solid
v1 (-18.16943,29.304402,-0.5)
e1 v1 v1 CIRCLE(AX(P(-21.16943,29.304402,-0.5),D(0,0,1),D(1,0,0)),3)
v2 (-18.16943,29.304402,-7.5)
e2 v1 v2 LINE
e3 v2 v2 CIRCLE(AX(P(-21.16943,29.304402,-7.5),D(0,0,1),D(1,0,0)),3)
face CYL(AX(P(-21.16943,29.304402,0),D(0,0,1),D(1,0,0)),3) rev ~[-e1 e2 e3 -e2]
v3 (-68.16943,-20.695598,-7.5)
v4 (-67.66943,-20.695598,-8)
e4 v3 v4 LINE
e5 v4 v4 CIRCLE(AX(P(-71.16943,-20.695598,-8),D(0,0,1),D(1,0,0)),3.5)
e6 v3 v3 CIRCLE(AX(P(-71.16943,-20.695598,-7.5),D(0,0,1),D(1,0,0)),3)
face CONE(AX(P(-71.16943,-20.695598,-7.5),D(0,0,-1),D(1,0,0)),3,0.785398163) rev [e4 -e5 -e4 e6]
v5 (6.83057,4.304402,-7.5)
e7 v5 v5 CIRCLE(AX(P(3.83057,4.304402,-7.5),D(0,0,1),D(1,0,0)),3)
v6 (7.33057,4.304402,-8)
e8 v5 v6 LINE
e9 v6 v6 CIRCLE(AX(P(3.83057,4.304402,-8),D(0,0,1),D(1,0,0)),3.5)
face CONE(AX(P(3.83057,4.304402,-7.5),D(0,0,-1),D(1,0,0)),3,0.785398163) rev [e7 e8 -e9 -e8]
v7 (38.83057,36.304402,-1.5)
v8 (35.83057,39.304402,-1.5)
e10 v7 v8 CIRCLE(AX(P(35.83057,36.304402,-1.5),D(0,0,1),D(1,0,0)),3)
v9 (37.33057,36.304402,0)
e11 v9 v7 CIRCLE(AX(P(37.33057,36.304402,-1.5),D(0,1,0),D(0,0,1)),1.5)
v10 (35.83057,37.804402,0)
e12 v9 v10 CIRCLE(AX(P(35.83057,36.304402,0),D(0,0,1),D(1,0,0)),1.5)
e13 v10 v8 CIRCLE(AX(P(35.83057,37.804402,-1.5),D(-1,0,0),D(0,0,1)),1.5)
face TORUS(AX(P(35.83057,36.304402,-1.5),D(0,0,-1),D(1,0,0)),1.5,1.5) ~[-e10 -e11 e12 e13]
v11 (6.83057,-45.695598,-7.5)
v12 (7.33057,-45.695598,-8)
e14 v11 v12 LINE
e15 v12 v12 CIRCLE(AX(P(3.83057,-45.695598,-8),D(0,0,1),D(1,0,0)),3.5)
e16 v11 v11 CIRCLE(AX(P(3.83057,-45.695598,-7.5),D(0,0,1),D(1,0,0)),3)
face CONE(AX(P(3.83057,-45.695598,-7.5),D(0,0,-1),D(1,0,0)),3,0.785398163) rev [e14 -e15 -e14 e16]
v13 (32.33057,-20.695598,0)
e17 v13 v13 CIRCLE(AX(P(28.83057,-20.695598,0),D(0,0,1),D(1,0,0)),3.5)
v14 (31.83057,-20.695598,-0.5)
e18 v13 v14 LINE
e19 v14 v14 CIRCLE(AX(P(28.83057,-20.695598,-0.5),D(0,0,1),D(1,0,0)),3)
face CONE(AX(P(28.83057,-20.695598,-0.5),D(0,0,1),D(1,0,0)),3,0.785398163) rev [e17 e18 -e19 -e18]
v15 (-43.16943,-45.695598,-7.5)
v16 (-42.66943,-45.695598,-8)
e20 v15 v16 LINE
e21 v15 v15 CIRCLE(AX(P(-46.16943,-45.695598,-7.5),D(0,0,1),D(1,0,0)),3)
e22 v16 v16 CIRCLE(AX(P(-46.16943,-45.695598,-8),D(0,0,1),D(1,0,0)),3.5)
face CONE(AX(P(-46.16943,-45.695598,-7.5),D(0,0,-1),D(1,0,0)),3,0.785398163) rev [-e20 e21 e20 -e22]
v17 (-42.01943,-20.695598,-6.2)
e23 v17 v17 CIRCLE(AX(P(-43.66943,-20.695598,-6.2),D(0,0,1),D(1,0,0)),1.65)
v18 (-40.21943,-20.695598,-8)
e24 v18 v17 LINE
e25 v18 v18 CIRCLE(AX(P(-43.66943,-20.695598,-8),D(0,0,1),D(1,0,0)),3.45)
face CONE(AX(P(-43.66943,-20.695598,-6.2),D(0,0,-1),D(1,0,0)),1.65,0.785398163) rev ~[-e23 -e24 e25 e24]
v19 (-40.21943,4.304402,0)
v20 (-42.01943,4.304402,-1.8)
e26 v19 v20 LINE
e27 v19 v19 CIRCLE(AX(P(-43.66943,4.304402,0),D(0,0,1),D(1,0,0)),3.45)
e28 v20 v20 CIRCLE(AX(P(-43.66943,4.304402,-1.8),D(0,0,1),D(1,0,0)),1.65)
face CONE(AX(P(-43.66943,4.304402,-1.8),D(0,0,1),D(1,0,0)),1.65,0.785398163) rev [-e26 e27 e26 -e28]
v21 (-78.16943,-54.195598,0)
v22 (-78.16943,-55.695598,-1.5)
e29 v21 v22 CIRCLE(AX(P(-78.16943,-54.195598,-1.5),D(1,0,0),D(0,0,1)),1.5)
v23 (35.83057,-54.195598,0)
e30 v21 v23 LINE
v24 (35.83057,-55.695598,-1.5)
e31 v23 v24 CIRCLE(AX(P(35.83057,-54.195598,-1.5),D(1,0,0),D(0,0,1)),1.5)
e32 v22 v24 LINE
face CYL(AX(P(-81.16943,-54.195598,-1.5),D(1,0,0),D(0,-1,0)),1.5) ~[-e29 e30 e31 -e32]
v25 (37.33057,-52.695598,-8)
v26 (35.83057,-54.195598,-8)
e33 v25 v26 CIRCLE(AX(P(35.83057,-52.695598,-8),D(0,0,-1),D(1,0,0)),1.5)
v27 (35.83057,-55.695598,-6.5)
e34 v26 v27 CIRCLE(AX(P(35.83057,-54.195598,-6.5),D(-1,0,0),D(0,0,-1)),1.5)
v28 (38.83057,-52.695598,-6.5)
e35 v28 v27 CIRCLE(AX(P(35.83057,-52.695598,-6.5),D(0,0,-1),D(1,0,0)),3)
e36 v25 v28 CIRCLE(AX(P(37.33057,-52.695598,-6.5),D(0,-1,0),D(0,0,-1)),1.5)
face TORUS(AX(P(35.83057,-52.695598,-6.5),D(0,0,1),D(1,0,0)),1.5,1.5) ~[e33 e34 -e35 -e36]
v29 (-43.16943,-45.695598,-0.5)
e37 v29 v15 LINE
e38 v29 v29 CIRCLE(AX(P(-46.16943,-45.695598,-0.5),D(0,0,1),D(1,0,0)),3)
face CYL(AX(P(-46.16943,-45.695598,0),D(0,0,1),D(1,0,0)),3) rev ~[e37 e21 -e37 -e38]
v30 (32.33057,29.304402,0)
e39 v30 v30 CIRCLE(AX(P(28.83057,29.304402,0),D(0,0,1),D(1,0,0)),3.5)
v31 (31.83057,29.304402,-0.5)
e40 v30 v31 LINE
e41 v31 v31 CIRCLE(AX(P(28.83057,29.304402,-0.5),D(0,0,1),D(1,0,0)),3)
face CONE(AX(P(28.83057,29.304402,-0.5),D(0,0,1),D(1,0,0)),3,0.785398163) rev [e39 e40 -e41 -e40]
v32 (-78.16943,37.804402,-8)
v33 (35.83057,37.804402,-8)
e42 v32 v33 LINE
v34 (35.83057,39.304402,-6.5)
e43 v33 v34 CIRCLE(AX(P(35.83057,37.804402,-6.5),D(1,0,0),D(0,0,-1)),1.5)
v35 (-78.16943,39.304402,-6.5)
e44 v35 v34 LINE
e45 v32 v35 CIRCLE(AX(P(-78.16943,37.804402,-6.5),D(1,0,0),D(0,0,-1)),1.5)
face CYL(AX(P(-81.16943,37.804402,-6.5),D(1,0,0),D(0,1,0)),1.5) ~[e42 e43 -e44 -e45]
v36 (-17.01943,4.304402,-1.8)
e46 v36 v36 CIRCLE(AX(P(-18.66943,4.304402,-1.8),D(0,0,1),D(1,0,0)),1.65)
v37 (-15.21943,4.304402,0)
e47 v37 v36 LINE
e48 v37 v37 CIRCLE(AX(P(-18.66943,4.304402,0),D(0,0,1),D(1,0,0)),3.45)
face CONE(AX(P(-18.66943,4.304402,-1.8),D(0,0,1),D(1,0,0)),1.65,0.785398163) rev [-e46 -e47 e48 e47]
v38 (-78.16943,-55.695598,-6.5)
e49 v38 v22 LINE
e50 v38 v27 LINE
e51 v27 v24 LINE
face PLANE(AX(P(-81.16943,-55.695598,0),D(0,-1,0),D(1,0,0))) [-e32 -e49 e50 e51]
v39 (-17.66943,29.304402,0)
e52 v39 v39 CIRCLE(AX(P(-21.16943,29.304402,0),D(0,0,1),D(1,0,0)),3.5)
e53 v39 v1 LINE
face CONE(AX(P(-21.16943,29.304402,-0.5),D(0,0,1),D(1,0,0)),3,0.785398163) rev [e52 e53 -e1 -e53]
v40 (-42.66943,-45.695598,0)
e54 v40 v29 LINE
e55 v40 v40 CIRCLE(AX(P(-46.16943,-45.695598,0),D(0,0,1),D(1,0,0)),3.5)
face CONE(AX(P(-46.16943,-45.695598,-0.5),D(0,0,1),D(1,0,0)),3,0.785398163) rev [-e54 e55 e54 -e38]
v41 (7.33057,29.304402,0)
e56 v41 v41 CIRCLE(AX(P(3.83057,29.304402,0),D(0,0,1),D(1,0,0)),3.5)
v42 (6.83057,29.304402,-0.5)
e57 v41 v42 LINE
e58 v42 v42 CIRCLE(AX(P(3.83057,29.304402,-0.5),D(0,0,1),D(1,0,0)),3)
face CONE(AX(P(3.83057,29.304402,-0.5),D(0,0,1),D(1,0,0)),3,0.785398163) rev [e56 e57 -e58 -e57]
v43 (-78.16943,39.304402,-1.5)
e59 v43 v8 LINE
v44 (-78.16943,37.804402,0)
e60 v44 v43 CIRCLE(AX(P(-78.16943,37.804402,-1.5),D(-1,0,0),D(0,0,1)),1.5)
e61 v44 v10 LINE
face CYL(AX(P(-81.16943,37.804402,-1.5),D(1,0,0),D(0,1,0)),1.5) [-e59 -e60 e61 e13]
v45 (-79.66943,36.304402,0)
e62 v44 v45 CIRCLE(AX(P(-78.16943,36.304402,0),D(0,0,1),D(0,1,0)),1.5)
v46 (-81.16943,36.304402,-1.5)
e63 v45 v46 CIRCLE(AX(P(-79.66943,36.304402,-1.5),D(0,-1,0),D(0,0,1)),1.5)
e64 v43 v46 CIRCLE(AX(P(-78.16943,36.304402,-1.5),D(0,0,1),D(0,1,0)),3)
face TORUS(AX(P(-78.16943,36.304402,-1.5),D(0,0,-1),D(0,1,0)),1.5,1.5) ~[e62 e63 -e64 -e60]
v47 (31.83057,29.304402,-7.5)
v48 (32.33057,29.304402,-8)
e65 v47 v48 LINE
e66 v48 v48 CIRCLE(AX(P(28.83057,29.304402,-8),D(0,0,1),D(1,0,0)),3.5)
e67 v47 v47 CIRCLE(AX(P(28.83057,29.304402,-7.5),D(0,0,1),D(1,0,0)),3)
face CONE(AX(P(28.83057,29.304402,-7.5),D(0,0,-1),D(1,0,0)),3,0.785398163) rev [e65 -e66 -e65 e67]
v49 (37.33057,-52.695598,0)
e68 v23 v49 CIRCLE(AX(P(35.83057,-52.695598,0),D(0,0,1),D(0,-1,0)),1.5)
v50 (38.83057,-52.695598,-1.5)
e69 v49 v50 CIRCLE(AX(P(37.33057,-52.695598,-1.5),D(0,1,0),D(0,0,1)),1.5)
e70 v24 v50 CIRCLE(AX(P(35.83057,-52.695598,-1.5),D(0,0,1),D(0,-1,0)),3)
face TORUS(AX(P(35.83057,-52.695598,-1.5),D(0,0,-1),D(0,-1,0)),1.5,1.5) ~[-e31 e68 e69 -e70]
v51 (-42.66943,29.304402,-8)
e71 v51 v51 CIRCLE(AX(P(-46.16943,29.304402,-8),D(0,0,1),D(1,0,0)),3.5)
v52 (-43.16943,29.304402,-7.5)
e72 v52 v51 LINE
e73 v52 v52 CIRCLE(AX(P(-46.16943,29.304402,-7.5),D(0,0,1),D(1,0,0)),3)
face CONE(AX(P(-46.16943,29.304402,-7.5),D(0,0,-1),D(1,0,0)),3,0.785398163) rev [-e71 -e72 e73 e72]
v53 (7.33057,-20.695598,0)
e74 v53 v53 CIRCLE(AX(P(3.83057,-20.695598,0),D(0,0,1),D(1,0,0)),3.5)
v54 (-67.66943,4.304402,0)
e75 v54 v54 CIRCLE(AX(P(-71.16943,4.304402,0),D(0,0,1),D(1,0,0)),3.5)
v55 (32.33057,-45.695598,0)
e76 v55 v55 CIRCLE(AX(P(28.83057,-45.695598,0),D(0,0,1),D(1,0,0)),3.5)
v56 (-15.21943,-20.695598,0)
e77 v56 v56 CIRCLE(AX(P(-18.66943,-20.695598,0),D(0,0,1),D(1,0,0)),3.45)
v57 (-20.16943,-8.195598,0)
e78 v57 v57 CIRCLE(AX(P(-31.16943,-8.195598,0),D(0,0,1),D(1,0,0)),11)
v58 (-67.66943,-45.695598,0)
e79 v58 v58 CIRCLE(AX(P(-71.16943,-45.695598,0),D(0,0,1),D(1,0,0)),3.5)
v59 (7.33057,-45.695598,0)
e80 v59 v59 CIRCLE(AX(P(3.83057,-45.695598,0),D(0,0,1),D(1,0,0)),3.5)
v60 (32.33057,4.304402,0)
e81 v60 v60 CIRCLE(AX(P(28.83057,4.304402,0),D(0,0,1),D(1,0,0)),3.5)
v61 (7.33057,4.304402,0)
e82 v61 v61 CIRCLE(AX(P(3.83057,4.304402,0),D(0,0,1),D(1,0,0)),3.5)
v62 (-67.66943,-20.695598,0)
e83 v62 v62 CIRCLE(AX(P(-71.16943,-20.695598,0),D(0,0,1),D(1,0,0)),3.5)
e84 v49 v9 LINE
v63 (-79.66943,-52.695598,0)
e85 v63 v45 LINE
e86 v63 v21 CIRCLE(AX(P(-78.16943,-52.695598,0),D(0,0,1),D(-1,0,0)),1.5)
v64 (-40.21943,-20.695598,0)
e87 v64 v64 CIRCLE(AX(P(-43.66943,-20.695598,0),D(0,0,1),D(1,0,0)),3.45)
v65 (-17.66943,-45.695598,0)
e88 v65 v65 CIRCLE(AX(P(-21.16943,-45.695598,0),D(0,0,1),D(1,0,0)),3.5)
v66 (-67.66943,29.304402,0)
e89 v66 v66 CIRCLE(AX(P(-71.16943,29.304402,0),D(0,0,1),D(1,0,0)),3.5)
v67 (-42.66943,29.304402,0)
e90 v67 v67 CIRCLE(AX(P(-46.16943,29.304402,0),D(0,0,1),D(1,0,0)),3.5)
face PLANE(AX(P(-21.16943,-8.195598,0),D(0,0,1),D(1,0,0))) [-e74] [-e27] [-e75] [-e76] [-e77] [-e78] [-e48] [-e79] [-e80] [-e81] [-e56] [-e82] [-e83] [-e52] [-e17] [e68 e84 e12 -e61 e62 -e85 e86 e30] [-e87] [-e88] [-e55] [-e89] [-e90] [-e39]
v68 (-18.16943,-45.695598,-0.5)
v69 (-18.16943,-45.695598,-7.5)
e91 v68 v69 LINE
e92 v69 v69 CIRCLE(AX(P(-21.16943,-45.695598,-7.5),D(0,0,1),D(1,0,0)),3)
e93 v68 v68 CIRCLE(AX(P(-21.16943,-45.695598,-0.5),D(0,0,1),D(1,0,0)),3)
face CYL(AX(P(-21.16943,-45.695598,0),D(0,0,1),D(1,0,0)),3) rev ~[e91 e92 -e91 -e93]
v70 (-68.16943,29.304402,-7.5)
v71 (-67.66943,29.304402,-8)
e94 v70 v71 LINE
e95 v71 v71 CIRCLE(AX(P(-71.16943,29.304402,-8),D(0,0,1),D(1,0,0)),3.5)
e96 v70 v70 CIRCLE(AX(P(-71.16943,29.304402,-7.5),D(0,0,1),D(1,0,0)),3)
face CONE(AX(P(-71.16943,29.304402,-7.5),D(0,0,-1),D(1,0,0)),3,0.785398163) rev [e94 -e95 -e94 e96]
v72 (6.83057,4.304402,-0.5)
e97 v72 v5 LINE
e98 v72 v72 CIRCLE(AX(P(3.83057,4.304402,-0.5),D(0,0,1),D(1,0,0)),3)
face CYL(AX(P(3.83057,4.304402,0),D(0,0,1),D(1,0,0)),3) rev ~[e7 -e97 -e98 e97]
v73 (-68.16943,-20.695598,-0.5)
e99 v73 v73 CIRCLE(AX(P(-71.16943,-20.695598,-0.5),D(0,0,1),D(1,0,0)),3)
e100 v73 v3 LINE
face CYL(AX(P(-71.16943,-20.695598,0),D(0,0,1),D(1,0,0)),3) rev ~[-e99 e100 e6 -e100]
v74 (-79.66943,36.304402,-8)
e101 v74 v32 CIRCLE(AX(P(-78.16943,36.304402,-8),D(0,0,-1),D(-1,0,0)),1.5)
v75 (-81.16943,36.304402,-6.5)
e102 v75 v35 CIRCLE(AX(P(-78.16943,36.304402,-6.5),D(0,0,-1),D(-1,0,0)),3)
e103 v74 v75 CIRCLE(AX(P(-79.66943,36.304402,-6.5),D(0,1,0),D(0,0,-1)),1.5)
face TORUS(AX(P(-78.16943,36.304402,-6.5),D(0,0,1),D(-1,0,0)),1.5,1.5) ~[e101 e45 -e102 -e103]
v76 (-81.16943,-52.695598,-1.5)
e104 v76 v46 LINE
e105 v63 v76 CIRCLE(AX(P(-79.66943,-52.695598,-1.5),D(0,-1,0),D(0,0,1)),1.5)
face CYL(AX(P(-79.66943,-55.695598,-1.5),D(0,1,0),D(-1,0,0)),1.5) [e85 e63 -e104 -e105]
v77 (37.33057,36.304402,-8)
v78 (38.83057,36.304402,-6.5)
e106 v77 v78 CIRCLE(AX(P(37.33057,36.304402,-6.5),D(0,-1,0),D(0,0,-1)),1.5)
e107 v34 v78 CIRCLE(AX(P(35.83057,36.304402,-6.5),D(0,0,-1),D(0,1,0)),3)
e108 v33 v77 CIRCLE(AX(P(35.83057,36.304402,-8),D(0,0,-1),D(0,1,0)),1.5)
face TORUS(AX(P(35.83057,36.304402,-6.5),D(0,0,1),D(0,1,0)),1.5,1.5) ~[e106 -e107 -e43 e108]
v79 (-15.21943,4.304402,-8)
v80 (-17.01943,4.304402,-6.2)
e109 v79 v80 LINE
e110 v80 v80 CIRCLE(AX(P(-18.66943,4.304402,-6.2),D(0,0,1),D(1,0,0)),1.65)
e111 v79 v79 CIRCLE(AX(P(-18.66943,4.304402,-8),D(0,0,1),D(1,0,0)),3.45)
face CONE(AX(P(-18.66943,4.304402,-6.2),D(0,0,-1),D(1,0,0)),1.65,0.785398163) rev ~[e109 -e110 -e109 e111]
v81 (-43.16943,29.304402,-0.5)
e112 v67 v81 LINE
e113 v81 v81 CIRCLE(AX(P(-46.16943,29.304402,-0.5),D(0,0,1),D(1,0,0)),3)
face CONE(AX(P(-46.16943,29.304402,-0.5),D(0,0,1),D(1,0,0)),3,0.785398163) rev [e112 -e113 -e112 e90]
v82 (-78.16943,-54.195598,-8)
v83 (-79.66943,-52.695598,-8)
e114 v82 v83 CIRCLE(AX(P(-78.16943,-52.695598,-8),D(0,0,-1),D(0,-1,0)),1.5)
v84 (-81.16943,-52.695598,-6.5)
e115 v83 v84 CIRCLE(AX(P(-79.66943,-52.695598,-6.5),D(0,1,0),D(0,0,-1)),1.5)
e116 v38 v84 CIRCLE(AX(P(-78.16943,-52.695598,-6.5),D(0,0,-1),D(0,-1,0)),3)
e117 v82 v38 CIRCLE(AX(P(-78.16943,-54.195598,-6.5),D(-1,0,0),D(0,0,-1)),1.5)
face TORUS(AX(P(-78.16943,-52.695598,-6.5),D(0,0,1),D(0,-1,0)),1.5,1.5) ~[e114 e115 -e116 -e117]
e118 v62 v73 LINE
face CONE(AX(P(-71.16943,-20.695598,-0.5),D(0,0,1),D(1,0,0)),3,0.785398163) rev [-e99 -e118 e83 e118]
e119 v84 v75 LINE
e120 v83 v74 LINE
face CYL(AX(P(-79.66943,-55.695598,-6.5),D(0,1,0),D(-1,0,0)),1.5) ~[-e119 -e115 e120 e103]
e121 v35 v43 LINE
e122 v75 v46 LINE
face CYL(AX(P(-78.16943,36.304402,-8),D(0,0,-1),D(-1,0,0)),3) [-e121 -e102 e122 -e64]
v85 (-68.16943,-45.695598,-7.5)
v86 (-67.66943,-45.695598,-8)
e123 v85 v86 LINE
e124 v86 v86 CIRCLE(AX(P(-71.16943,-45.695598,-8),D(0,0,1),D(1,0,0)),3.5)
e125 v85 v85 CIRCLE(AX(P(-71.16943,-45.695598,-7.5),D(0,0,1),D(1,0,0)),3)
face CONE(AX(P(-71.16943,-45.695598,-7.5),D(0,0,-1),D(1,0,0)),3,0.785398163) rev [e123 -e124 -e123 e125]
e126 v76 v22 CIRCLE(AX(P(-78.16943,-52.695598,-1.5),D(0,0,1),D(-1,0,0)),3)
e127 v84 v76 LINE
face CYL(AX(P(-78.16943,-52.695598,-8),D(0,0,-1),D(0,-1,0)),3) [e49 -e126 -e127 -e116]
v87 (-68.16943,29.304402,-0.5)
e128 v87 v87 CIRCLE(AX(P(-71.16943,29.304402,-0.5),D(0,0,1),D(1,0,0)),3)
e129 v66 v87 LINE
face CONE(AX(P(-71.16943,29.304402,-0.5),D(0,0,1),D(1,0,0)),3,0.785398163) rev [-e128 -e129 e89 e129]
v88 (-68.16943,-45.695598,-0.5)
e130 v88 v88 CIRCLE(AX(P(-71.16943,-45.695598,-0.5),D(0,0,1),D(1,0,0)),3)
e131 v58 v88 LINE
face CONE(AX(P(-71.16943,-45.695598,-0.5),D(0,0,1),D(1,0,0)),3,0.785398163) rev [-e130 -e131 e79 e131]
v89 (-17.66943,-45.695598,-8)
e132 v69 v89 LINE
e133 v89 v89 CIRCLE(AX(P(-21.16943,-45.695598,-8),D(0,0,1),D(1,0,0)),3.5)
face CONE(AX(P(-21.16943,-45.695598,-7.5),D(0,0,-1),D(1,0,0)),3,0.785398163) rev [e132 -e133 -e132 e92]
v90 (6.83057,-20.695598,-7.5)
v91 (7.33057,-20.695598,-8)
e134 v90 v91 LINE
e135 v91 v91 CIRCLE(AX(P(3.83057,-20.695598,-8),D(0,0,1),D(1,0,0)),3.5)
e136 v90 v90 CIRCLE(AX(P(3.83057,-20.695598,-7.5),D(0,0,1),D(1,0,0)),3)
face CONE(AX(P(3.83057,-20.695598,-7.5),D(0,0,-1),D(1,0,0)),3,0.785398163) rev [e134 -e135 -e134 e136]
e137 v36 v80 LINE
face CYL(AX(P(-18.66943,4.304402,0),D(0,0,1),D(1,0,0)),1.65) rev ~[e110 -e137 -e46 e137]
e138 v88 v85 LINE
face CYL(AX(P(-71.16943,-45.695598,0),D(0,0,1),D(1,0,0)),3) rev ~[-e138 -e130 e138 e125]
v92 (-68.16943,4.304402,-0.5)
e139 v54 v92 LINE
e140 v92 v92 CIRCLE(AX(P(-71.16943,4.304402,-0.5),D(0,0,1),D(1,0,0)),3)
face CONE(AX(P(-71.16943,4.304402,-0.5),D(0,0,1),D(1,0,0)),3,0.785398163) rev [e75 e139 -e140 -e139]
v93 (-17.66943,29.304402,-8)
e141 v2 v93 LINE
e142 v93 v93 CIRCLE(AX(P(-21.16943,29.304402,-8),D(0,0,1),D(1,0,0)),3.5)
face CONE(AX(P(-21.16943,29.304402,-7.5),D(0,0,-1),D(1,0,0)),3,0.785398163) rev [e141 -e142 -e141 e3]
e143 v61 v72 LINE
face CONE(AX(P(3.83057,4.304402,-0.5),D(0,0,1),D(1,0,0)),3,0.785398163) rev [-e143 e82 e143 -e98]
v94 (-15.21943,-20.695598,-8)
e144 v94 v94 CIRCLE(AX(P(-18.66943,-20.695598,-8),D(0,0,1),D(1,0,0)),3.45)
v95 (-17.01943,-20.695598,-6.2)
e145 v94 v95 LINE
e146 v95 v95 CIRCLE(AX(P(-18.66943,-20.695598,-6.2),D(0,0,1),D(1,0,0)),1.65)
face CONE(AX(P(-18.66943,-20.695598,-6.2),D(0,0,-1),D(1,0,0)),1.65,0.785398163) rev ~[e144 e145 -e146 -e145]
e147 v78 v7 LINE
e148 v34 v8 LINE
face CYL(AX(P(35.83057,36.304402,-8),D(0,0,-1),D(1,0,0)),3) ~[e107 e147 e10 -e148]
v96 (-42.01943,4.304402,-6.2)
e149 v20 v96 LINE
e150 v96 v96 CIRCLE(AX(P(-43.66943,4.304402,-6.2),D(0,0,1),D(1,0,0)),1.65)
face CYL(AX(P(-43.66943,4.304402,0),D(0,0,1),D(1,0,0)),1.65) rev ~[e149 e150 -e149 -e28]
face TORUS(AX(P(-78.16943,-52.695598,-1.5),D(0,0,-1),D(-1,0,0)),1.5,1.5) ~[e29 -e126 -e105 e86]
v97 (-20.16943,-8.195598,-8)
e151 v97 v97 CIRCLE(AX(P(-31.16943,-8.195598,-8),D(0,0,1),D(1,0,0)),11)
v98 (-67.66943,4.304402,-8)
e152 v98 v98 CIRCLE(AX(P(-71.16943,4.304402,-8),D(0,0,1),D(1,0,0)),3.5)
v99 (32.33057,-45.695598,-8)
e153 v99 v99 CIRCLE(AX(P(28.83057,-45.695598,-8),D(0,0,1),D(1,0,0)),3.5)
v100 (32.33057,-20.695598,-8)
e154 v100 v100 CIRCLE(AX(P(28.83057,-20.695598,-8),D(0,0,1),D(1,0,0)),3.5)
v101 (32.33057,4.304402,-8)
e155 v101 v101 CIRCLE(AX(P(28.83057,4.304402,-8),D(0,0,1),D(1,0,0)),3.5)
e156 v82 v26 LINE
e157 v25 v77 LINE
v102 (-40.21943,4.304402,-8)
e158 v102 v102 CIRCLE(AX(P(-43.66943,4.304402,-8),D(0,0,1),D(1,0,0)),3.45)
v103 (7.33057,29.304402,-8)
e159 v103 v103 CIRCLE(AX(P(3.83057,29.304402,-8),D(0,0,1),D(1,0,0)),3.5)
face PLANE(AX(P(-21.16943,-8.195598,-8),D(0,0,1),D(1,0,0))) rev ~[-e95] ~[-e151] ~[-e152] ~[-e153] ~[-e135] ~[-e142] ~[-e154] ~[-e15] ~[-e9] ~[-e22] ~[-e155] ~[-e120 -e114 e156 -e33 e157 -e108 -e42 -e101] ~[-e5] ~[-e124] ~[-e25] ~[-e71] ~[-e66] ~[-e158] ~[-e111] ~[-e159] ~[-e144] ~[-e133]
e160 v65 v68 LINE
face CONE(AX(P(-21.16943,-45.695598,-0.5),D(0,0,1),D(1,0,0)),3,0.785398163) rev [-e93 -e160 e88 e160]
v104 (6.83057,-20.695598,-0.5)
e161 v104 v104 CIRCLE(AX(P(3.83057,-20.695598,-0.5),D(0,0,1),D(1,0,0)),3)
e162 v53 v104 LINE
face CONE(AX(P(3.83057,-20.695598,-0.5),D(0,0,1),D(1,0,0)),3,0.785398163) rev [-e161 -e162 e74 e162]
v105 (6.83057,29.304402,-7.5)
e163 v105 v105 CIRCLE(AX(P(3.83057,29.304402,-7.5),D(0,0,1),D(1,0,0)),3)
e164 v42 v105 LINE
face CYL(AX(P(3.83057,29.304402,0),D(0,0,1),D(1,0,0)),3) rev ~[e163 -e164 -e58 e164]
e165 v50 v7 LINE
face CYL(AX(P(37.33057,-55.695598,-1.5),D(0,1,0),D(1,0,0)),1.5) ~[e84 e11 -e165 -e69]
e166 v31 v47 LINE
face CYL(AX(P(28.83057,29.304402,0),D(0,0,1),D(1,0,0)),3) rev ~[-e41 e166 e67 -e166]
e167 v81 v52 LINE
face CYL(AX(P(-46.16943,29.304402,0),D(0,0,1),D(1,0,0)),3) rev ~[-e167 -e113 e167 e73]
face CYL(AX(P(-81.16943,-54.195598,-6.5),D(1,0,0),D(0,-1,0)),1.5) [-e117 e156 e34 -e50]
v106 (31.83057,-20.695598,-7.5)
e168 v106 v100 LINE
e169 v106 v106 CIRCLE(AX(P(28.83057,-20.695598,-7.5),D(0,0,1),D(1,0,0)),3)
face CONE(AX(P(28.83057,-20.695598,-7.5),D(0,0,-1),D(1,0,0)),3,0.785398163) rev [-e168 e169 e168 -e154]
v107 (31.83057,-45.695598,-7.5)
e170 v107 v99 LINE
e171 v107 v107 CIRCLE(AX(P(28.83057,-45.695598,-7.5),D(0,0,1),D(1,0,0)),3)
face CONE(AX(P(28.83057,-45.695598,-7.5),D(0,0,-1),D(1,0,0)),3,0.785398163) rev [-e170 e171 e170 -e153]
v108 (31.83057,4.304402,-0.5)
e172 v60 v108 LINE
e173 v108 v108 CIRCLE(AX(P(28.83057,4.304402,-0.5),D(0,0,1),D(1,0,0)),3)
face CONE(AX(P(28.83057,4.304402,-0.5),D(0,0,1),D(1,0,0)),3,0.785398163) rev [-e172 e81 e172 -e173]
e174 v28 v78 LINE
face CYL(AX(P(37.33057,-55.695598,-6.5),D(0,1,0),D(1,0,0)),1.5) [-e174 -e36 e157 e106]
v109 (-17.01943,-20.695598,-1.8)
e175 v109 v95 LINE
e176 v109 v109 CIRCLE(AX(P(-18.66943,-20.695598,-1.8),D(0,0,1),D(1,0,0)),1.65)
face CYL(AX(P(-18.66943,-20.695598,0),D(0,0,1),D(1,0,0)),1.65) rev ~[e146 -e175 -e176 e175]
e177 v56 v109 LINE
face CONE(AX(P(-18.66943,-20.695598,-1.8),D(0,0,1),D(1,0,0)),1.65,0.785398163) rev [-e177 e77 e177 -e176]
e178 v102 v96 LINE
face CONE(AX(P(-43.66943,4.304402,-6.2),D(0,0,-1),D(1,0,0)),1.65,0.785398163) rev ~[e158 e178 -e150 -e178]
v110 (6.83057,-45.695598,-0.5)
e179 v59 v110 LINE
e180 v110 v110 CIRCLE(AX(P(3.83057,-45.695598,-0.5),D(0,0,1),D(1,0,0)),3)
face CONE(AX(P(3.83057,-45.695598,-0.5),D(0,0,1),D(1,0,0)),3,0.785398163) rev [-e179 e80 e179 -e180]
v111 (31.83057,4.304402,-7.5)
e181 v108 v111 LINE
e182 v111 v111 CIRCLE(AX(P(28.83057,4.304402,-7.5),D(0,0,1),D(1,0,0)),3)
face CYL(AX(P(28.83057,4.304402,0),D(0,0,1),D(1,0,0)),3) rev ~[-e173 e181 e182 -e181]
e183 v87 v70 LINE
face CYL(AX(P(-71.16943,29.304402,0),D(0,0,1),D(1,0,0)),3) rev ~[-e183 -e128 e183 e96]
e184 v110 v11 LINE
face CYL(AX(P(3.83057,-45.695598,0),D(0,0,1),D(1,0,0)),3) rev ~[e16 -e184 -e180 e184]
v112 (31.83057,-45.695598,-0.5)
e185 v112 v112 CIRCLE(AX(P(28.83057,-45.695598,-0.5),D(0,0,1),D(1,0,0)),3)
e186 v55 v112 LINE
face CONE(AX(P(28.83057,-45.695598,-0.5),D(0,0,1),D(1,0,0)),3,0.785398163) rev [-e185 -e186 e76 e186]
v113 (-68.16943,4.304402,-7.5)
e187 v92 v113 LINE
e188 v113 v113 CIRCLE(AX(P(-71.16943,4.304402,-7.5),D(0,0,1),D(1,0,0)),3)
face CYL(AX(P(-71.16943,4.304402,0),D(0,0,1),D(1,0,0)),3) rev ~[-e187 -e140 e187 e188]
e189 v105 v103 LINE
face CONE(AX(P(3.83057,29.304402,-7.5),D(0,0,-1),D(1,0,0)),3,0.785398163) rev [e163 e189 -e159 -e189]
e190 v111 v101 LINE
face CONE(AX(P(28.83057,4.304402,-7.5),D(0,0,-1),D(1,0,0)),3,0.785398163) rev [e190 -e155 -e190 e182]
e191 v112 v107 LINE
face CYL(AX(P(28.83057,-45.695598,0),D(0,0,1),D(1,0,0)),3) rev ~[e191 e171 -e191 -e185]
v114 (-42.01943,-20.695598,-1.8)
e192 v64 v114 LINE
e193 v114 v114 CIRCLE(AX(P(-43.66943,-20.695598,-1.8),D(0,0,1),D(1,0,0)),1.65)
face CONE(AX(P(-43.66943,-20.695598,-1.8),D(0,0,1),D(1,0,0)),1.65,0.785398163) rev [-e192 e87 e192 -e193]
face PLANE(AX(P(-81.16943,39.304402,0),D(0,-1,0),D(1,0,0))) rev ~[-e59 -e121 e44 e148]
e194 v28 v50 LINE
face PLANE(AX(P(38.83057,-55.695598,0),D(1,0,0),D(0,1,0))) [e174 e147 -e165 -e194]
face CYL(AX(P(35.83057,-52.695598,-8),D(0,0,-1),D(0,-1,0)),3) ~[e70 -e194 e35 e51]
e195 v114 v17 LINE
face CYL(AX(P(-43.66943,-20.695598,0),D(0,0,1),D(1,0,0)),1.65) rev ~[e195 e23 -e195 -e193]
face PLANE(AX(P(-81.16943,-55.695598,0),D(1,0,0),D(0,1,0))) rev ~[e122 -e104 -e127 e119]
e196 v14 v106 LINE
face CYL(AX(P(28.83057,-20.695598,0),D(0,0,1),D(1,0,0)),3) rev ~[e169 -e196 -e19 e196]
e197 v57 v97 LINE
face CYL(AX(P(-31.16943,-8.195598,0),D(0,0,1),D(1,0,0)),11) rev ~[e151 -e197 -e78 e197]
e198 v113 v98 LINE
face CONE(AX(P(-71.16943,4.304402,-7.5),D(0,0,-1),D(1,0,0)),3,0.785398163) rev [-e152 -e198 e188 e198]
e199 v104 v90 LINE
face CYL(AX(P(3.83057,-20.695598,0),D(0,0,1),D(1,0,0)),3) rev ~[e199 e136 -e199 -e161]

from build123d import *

# Parameters (mm, degrees)
F0_W         = 120
F0_H         = 95
F0_R         = 3
F0_R_2       = 1.65
F0_R_3       = 11
F1_DEPTH     = 8
F2_R         = 1.5
F3_SIZE      = 1.8
F4_T1_DEPTH  = 8
F4_T4_ANGLE  = 90
F4_T6_ANGLE  = 90
F4_T8_ANGLE  = 90
F4_T10_ANGLE = 90
F4_T12_ANGLE = 90
F4_T14_ANGLE = 90
F4_T16_ANGLE = 90
F4_T18_ANGLE = 90
F5_SIZE      = 0.5


# Not quite as in the source:
# - a fillet or chamfer that OpenCascade refuses, or shapes differently, is made with other operations: its cross-section is extruded or revolved along the edge and cut away or added


with BuildPart() as f1:
    # F0 (on Top) → F1 (new body)
    with BuildSketch(Plane.XY):
        with Locations((-21.1694301665, -8.1955979578)):
            Rectangle(F0_W, F0_H)
        with Locations((-71.1694301665, -45.6955979578)):
            Circle(F0_R, mode=Mode.SUBTRACT)
        with Locations((-46.1694301665, -45.6955979578)):
            Circle(F0_R, mode=Mode.SUBTRACT)
        with Locations((-21.1694301665, -45.6955979578)):
            Circle(F0_R, mode=Mode.SUBTRACT)
        with Locations((-71.1694301665, -20.6955979578)):
            Circle(F0_R, mode=Mode.SUBTRACT)
        with Locations((-43.6694301665, -20.6955979578)):
            Circle(F0_R_2, mode=Mode.SUBTRACT)
        with Locations((3.8305698335, -45.6955979578)):
            Circle(F0_R, mode=Mode.SUBTRACT)
        with Locations((28.8305698335, -45.6955979578)):
            Circle(F0_R, mode=Mode.SUBTRACT)
        with Locations((-18.6694301665, -20.6955979578)):
            Circle(F0_R_2, mode=Mode.SUBTRACT)
        with Locations((3.8305698335, -20.6955979578)):
            Circle(F0_R, mode=Mode.SUBTRACT)
        with Locations((28.8305698335, -20.6955979578)):
            Circle(F0_R, mode=Mode.SUBTRACT)
        with Locations((-71.1694301665, 4.3044020422)):
            Circle(F0_R, mode=Mode.SUBTRACT)
        with Locations((-31.1694301665, -8.1955979578)):
            Circle(F0_R_3, mode=Mode.SUBTRACT)
        with Locations((-43.6694301665, 4.3044020422)):
            Circle(F0_R_2, mode=Mode.SUBTRACT)
        with Locations((-71.1694301665, 29.3044020422)):
            Circle(F0_R, mode=Mode.SUBTRACT)
        with Locations((-46.1694301665, 29.3044020422)):
            Circle(F0_R, mode=Mode.SUBTRACT)
        with Locations((-21.1694301665, 29.3044020422)):
            Circle(F0_R, mode=Mode.SUBTRACT)
        with Locations((-18.6694301665, 4.3044020422)):
            Circle(F0_R_2, mode=Mode.SUBTRACT)
        with Locations((3.8305698335, 4.3044020422)):
            Circle(F0_R, mode=Mode.SUBTRACT)
        with Locations((28.8305698335, 4.3044020422)):
            Circle(F0_R, mode=Mode.SUBTRACT)
        with Locations((3.8305698335, 29.3044020422)):
            Circle(F0_R, mode=Mode.SUBTRACT)
        with Locations((28.8305698335, 29.3044020422)):
            Circle(F0_R, mode=Mode.SUBTRACT)
    extrude(amount=-F1_DEPTH)

    # F2
    f2_edges = [f1.edges().sort_by_distance(p)[0] for p in [
        (-21.16943, -55.695598, 0),
        (38.83057, -8.195598, 0),
        (-21.16943, 39.304402, 0),
        (-81.16943, -8.195598, 0),
        (-21.16943, -55.695598, -8),
        (38.83057, -8.195598, -8),
        (-81.16943, -8.195598, -8),
        (-21.16943, 39.304402, -8),
    ]]
    fillet(f2_edges, radius=F2_R)

    # F3
    f3_edges = [f1.edges().sort_by_distance(p)[0] for p in [
        (-45.31943, 4.304402, 0),
        (-20.31943, 4.304402, 0),
        (-20.31943, -20.695598, 0),
        (-45.31943, -20.695598, 0),
        (-45.31943, -20.695598, -8),
        (-20.31943, 4.304402, -8),
        (-20.31943, -20.695598, -8),
        (-45.31943, 4.304402, -8),
    ]]
    chamfer(f3_edges, length=F3_SIZE)

    # F4: fillet of radius 3 on 4 edges, made by hand

    # F4_s2 → F4_t1 (cut)
    with BuildSketch(Plane.XY.offset(-8)):
        with BuildLine():
            ThreePointArc((-78.1694301665, -55.6955979578), (-80.29075051, -54.8169183014), (-81.1694301665, -52.6955979578))
            Line((-81.1694301665, -52.6955979578), (-81.1694301665, -55.6955979578))
            Line((-81.1694301665, -55.6955979578), (-78.1694301665, -55.6955979578))
        make_face()
        with BuildLine():
            ThreePointArc((35.8305698335, -55.6955979578), (37.9518901771, -54.8169183014), (38.8305698335, -52.6955979578))
            Line((38.8305698335, -52.6955979578), (38.8305698335, -55.6955979578))
            Line((38.8305698335, -55.6955979578), (35.8305698335, -55.6955979578))
        make_face()
        with BuildLine():
            ThreePointArc((-81.1694301665, 36.3044020422), (-80.29075051, 38.4257223857), (-78.1694301665, 39.3044020422))
            Line((-78.1694301665, 39.3044020422), (-81.1694301665, 39.3044020422))
            Line((-81.1694301665, 39.3044020422), (-81.1694301665, 36.3044020422))
        make_face()
        with BuildLine():
            ThreePointArc((38.8305698335, 36.3044020422), (37.9518901771, 38.4257223857), (35.8305698335, 39.3044020422))
            Line((35.8305698335, 39.3044020422), (38.8305698335, 39.3044020422))
            Line((38.8305698335, 39.3044020422), (38.8305698335, 36.3044020422))
        make_face()
    extrude(amount=F4_T1_DEPTH, mode=Mode.SUBTRACT)

    # F4_s3 → F4_t4 (revolve, cut)
    with BuildSketch(Plane.XZ.offset(-36.3044020422)):
        with BuildLine():
            ThreePointArc((37.3305698335, 0), (38.3912300053, -0.4393398282), (38.8305698335, -1.5))
            Line((38.8305698335, -1.5), (38.8305698335, 0))
            Line((38.8305698335, 0), (37.3305698335, 0))
        make_face()
    revolve(axis=Axis((35.8305698335, 36.3044020422, 0), (0, 0, 1)), revolution_arc=F4_T4_ANGLE, mode=Mode.SUBTRACT)

    # F4_s5 → F4_t6 (revolve, cut)
    with BuildSketch(Plane.YZ.offset(35.8305698335)):
        with BuildLine():
            ThreePointArc((37.8044020422, -8), (38.865062214, -7.5606601718), (39.3044020422, -6.5))
            Line((39.3044020422, -6.5), (39.3044020422, -8))
            Line((39.3044020422, -8), (37.8044020422, -8))
        make_face()
    revolve(axis=Axis((35.8305698335, 36.3044020422, -8), (0, 0, -1)), revolution_arc=F4_T6_ANGLE, mode=Mode.SUBTRACT)

    # F4_s7 → F4_t8 (revolve, cut)
    with BuildSketch(Plane.YZ.offset(-78.1694301665)):
        with BuildLine():
            ThreePointArc((37.8044020422, 0), (38.865062214, -0.4393398282), (39.3044020422, -1.5))
            Line((39.3044020422, -1.5), (39.3044020422, 0))
            Line((39.3044020422, 0), (37.8044020422, 0))
        make_face()
    revolve(axis=Axis((-78.1694301665, 36.3044020422, 0), (0, 0, 1)), revolution_arc=F4_T8_ANGLE, mode=Mode.SUBTRACT)

    # F4_s9 → F4_t10 (revolve, cut)
    with BuildSketch(Plane.XZ.offset(-36.3044020422)):
        with BuildLine():
            ThreePointArc((-79.6694301665, -8), (-80.7300903383, -7.5606601718), (-81.1694301665, -6.5))
            Line((-81.1694301665, -6.5), (-81.1694301665, -8))
            Line((-81.1694301665, -8), (-79.6694301665, -8))
        make_face()
    revolve(axis=Axis((-78.1694301665, 36.3044020422, -8), (0, 0, -1)), revolution_arc=F4_T10_ANGLE, mode=Mode.SUBTRACT)

    # F4_s11 → F4_t12 (revolve, cut)
    with BuildSketch(Plane.YZ.offset(35.8305698335)):
        with BuildLine():
            ThreePointArc((-54.1955979578, 0), (-55.2562581296, -0.4393398282), (-55.6955979578, -1.5))
            Line((-55.6955979578, -1.5), (-55.6955979578, 0))
            Line((-55.6955979578, 0), (-54.1955979578, 0))
        make_face()
    revolve(axis=Axis((35.8305698335, -52.6955979578, 0), (0, 0, 1)), revolution_arc=F4_T12_ANGLE, mode=Mode.SUBTRACT)

    # F4_s13 → F4_t14 (revolve, cut)
    with BuildSketch(Plane.XZ.offset(52.6955979578)):
        with BuildLine():
            ThreePointArc((37.3305698335, -8), (38.3912300053, -7.5606601718), (38.8305698335, -6.5))
            Line((38.8305698335, -6.5), (38.8305698335, -8))
            Line((38.8305698335, -8), (37.3305698335, -8))
        make_face()
    revolve(axis=Axis((35.8305698335, -52.6955979578, -8), (0, 0, -1)), revolution_arc=F4_T14_ANGLE, mode=Mode.SUBTRACT)

    # F4_s15 → F4_t16 (revolve, cut)
    with BuildSketch(Plane.XZ.offset(52.6955979578)):
        with BuildLine():
            ThreePointArc((-79.6694301665, 0), (-80.7300903383, -0.4393398282), (-81.1694301665, -1.5))
            Line((-81.1694301665, -1.5), (-81.1694301665, 0))
            Line((-81.1694301665, 0), (-79.6694301665, 0))
        make_face()
    revolve(axis=Axis((-78.1694301665, -52.6955979578, 0), (0, 0, 1)), revolution_arc=F4_T16_ANGLE, mode=Mode.SUBTRACT)

    # F4_s17 → F4_t18 (revolve, cut)
    with BuildSketch(Plane.YZ.offset(-78.1694301665)):
        with BuildLine():
            ThreePointArc((-54.1955979578, -8), (-55.2562581296, -7.5606601718), (-55.6955979578, -6.5))
            Line((-55.6955979578, -6.5), (-55.6955979578, -8))
            Line((-55.6955979578, -8), (-54.1955979578, -8))
        make_face()
    revolve(axis=Axis((-78.1694301665, -52.6955979578, -8), (0, 0, -1)), revolution_arc=F4_T18_ANGLE, mode=Mode.SUBTRACT)

    # F5
    f5_edges = [f1.edges().sort_by_distance(p)[0] for p in [
        (-74.16943, -45.695598, -8),
        (-74.16943, -45.695598, 0),
        (25.83057, -45.695598, -8),
        (0.83057, -45.695598, -8),
        (-49.16943, -45.695598, -8),
        (-24.16943, -45.695598, -8),
        (0.83057, -45.695598, 0),
        (25.83057, -45.695598, 0),
        (-24.16943, -45.695598, 0),
        (-49.16943, -45.695598, 0),
        (25.83057, 4.304402, -8),
        (0.83057, 4.304402, -8),
        (0.83057, -20.695598, -8),
        (0.83057, 4.304402, 0),
        (25.83057, -20.695598, -8),
        (25.83057, 29.304402, -8),
        (0.83057, -20.695598, 0),
        (0.83057, 29.304402, -8),
        (25.83057, 4.304402, 0),
        (0.83057, 29.304402, 0),
        (25.83057, 29.304402, 0),
        (25.83057, -20.695598, 0),
        (-24.16943, 29.304402, -8),
        (-49.16943, 29.304402, -8),
        (-74.16943, 29.304402, -8),
        (-24.16943, 29.304402, 0),
        (-49.16943, 29.304402, 0),
        (-74.16943, 29.304402, 0),
        (-74.16943, 4.304402, -8),
        (-74.16943, -20.695598, -8),
        (-74.16943, -20.695598, 0),
        (-74.16943, 4.304402, 0),
    ]]
    chamfer(f5_edges, length=F5_SIZE)


solid = f1.part
